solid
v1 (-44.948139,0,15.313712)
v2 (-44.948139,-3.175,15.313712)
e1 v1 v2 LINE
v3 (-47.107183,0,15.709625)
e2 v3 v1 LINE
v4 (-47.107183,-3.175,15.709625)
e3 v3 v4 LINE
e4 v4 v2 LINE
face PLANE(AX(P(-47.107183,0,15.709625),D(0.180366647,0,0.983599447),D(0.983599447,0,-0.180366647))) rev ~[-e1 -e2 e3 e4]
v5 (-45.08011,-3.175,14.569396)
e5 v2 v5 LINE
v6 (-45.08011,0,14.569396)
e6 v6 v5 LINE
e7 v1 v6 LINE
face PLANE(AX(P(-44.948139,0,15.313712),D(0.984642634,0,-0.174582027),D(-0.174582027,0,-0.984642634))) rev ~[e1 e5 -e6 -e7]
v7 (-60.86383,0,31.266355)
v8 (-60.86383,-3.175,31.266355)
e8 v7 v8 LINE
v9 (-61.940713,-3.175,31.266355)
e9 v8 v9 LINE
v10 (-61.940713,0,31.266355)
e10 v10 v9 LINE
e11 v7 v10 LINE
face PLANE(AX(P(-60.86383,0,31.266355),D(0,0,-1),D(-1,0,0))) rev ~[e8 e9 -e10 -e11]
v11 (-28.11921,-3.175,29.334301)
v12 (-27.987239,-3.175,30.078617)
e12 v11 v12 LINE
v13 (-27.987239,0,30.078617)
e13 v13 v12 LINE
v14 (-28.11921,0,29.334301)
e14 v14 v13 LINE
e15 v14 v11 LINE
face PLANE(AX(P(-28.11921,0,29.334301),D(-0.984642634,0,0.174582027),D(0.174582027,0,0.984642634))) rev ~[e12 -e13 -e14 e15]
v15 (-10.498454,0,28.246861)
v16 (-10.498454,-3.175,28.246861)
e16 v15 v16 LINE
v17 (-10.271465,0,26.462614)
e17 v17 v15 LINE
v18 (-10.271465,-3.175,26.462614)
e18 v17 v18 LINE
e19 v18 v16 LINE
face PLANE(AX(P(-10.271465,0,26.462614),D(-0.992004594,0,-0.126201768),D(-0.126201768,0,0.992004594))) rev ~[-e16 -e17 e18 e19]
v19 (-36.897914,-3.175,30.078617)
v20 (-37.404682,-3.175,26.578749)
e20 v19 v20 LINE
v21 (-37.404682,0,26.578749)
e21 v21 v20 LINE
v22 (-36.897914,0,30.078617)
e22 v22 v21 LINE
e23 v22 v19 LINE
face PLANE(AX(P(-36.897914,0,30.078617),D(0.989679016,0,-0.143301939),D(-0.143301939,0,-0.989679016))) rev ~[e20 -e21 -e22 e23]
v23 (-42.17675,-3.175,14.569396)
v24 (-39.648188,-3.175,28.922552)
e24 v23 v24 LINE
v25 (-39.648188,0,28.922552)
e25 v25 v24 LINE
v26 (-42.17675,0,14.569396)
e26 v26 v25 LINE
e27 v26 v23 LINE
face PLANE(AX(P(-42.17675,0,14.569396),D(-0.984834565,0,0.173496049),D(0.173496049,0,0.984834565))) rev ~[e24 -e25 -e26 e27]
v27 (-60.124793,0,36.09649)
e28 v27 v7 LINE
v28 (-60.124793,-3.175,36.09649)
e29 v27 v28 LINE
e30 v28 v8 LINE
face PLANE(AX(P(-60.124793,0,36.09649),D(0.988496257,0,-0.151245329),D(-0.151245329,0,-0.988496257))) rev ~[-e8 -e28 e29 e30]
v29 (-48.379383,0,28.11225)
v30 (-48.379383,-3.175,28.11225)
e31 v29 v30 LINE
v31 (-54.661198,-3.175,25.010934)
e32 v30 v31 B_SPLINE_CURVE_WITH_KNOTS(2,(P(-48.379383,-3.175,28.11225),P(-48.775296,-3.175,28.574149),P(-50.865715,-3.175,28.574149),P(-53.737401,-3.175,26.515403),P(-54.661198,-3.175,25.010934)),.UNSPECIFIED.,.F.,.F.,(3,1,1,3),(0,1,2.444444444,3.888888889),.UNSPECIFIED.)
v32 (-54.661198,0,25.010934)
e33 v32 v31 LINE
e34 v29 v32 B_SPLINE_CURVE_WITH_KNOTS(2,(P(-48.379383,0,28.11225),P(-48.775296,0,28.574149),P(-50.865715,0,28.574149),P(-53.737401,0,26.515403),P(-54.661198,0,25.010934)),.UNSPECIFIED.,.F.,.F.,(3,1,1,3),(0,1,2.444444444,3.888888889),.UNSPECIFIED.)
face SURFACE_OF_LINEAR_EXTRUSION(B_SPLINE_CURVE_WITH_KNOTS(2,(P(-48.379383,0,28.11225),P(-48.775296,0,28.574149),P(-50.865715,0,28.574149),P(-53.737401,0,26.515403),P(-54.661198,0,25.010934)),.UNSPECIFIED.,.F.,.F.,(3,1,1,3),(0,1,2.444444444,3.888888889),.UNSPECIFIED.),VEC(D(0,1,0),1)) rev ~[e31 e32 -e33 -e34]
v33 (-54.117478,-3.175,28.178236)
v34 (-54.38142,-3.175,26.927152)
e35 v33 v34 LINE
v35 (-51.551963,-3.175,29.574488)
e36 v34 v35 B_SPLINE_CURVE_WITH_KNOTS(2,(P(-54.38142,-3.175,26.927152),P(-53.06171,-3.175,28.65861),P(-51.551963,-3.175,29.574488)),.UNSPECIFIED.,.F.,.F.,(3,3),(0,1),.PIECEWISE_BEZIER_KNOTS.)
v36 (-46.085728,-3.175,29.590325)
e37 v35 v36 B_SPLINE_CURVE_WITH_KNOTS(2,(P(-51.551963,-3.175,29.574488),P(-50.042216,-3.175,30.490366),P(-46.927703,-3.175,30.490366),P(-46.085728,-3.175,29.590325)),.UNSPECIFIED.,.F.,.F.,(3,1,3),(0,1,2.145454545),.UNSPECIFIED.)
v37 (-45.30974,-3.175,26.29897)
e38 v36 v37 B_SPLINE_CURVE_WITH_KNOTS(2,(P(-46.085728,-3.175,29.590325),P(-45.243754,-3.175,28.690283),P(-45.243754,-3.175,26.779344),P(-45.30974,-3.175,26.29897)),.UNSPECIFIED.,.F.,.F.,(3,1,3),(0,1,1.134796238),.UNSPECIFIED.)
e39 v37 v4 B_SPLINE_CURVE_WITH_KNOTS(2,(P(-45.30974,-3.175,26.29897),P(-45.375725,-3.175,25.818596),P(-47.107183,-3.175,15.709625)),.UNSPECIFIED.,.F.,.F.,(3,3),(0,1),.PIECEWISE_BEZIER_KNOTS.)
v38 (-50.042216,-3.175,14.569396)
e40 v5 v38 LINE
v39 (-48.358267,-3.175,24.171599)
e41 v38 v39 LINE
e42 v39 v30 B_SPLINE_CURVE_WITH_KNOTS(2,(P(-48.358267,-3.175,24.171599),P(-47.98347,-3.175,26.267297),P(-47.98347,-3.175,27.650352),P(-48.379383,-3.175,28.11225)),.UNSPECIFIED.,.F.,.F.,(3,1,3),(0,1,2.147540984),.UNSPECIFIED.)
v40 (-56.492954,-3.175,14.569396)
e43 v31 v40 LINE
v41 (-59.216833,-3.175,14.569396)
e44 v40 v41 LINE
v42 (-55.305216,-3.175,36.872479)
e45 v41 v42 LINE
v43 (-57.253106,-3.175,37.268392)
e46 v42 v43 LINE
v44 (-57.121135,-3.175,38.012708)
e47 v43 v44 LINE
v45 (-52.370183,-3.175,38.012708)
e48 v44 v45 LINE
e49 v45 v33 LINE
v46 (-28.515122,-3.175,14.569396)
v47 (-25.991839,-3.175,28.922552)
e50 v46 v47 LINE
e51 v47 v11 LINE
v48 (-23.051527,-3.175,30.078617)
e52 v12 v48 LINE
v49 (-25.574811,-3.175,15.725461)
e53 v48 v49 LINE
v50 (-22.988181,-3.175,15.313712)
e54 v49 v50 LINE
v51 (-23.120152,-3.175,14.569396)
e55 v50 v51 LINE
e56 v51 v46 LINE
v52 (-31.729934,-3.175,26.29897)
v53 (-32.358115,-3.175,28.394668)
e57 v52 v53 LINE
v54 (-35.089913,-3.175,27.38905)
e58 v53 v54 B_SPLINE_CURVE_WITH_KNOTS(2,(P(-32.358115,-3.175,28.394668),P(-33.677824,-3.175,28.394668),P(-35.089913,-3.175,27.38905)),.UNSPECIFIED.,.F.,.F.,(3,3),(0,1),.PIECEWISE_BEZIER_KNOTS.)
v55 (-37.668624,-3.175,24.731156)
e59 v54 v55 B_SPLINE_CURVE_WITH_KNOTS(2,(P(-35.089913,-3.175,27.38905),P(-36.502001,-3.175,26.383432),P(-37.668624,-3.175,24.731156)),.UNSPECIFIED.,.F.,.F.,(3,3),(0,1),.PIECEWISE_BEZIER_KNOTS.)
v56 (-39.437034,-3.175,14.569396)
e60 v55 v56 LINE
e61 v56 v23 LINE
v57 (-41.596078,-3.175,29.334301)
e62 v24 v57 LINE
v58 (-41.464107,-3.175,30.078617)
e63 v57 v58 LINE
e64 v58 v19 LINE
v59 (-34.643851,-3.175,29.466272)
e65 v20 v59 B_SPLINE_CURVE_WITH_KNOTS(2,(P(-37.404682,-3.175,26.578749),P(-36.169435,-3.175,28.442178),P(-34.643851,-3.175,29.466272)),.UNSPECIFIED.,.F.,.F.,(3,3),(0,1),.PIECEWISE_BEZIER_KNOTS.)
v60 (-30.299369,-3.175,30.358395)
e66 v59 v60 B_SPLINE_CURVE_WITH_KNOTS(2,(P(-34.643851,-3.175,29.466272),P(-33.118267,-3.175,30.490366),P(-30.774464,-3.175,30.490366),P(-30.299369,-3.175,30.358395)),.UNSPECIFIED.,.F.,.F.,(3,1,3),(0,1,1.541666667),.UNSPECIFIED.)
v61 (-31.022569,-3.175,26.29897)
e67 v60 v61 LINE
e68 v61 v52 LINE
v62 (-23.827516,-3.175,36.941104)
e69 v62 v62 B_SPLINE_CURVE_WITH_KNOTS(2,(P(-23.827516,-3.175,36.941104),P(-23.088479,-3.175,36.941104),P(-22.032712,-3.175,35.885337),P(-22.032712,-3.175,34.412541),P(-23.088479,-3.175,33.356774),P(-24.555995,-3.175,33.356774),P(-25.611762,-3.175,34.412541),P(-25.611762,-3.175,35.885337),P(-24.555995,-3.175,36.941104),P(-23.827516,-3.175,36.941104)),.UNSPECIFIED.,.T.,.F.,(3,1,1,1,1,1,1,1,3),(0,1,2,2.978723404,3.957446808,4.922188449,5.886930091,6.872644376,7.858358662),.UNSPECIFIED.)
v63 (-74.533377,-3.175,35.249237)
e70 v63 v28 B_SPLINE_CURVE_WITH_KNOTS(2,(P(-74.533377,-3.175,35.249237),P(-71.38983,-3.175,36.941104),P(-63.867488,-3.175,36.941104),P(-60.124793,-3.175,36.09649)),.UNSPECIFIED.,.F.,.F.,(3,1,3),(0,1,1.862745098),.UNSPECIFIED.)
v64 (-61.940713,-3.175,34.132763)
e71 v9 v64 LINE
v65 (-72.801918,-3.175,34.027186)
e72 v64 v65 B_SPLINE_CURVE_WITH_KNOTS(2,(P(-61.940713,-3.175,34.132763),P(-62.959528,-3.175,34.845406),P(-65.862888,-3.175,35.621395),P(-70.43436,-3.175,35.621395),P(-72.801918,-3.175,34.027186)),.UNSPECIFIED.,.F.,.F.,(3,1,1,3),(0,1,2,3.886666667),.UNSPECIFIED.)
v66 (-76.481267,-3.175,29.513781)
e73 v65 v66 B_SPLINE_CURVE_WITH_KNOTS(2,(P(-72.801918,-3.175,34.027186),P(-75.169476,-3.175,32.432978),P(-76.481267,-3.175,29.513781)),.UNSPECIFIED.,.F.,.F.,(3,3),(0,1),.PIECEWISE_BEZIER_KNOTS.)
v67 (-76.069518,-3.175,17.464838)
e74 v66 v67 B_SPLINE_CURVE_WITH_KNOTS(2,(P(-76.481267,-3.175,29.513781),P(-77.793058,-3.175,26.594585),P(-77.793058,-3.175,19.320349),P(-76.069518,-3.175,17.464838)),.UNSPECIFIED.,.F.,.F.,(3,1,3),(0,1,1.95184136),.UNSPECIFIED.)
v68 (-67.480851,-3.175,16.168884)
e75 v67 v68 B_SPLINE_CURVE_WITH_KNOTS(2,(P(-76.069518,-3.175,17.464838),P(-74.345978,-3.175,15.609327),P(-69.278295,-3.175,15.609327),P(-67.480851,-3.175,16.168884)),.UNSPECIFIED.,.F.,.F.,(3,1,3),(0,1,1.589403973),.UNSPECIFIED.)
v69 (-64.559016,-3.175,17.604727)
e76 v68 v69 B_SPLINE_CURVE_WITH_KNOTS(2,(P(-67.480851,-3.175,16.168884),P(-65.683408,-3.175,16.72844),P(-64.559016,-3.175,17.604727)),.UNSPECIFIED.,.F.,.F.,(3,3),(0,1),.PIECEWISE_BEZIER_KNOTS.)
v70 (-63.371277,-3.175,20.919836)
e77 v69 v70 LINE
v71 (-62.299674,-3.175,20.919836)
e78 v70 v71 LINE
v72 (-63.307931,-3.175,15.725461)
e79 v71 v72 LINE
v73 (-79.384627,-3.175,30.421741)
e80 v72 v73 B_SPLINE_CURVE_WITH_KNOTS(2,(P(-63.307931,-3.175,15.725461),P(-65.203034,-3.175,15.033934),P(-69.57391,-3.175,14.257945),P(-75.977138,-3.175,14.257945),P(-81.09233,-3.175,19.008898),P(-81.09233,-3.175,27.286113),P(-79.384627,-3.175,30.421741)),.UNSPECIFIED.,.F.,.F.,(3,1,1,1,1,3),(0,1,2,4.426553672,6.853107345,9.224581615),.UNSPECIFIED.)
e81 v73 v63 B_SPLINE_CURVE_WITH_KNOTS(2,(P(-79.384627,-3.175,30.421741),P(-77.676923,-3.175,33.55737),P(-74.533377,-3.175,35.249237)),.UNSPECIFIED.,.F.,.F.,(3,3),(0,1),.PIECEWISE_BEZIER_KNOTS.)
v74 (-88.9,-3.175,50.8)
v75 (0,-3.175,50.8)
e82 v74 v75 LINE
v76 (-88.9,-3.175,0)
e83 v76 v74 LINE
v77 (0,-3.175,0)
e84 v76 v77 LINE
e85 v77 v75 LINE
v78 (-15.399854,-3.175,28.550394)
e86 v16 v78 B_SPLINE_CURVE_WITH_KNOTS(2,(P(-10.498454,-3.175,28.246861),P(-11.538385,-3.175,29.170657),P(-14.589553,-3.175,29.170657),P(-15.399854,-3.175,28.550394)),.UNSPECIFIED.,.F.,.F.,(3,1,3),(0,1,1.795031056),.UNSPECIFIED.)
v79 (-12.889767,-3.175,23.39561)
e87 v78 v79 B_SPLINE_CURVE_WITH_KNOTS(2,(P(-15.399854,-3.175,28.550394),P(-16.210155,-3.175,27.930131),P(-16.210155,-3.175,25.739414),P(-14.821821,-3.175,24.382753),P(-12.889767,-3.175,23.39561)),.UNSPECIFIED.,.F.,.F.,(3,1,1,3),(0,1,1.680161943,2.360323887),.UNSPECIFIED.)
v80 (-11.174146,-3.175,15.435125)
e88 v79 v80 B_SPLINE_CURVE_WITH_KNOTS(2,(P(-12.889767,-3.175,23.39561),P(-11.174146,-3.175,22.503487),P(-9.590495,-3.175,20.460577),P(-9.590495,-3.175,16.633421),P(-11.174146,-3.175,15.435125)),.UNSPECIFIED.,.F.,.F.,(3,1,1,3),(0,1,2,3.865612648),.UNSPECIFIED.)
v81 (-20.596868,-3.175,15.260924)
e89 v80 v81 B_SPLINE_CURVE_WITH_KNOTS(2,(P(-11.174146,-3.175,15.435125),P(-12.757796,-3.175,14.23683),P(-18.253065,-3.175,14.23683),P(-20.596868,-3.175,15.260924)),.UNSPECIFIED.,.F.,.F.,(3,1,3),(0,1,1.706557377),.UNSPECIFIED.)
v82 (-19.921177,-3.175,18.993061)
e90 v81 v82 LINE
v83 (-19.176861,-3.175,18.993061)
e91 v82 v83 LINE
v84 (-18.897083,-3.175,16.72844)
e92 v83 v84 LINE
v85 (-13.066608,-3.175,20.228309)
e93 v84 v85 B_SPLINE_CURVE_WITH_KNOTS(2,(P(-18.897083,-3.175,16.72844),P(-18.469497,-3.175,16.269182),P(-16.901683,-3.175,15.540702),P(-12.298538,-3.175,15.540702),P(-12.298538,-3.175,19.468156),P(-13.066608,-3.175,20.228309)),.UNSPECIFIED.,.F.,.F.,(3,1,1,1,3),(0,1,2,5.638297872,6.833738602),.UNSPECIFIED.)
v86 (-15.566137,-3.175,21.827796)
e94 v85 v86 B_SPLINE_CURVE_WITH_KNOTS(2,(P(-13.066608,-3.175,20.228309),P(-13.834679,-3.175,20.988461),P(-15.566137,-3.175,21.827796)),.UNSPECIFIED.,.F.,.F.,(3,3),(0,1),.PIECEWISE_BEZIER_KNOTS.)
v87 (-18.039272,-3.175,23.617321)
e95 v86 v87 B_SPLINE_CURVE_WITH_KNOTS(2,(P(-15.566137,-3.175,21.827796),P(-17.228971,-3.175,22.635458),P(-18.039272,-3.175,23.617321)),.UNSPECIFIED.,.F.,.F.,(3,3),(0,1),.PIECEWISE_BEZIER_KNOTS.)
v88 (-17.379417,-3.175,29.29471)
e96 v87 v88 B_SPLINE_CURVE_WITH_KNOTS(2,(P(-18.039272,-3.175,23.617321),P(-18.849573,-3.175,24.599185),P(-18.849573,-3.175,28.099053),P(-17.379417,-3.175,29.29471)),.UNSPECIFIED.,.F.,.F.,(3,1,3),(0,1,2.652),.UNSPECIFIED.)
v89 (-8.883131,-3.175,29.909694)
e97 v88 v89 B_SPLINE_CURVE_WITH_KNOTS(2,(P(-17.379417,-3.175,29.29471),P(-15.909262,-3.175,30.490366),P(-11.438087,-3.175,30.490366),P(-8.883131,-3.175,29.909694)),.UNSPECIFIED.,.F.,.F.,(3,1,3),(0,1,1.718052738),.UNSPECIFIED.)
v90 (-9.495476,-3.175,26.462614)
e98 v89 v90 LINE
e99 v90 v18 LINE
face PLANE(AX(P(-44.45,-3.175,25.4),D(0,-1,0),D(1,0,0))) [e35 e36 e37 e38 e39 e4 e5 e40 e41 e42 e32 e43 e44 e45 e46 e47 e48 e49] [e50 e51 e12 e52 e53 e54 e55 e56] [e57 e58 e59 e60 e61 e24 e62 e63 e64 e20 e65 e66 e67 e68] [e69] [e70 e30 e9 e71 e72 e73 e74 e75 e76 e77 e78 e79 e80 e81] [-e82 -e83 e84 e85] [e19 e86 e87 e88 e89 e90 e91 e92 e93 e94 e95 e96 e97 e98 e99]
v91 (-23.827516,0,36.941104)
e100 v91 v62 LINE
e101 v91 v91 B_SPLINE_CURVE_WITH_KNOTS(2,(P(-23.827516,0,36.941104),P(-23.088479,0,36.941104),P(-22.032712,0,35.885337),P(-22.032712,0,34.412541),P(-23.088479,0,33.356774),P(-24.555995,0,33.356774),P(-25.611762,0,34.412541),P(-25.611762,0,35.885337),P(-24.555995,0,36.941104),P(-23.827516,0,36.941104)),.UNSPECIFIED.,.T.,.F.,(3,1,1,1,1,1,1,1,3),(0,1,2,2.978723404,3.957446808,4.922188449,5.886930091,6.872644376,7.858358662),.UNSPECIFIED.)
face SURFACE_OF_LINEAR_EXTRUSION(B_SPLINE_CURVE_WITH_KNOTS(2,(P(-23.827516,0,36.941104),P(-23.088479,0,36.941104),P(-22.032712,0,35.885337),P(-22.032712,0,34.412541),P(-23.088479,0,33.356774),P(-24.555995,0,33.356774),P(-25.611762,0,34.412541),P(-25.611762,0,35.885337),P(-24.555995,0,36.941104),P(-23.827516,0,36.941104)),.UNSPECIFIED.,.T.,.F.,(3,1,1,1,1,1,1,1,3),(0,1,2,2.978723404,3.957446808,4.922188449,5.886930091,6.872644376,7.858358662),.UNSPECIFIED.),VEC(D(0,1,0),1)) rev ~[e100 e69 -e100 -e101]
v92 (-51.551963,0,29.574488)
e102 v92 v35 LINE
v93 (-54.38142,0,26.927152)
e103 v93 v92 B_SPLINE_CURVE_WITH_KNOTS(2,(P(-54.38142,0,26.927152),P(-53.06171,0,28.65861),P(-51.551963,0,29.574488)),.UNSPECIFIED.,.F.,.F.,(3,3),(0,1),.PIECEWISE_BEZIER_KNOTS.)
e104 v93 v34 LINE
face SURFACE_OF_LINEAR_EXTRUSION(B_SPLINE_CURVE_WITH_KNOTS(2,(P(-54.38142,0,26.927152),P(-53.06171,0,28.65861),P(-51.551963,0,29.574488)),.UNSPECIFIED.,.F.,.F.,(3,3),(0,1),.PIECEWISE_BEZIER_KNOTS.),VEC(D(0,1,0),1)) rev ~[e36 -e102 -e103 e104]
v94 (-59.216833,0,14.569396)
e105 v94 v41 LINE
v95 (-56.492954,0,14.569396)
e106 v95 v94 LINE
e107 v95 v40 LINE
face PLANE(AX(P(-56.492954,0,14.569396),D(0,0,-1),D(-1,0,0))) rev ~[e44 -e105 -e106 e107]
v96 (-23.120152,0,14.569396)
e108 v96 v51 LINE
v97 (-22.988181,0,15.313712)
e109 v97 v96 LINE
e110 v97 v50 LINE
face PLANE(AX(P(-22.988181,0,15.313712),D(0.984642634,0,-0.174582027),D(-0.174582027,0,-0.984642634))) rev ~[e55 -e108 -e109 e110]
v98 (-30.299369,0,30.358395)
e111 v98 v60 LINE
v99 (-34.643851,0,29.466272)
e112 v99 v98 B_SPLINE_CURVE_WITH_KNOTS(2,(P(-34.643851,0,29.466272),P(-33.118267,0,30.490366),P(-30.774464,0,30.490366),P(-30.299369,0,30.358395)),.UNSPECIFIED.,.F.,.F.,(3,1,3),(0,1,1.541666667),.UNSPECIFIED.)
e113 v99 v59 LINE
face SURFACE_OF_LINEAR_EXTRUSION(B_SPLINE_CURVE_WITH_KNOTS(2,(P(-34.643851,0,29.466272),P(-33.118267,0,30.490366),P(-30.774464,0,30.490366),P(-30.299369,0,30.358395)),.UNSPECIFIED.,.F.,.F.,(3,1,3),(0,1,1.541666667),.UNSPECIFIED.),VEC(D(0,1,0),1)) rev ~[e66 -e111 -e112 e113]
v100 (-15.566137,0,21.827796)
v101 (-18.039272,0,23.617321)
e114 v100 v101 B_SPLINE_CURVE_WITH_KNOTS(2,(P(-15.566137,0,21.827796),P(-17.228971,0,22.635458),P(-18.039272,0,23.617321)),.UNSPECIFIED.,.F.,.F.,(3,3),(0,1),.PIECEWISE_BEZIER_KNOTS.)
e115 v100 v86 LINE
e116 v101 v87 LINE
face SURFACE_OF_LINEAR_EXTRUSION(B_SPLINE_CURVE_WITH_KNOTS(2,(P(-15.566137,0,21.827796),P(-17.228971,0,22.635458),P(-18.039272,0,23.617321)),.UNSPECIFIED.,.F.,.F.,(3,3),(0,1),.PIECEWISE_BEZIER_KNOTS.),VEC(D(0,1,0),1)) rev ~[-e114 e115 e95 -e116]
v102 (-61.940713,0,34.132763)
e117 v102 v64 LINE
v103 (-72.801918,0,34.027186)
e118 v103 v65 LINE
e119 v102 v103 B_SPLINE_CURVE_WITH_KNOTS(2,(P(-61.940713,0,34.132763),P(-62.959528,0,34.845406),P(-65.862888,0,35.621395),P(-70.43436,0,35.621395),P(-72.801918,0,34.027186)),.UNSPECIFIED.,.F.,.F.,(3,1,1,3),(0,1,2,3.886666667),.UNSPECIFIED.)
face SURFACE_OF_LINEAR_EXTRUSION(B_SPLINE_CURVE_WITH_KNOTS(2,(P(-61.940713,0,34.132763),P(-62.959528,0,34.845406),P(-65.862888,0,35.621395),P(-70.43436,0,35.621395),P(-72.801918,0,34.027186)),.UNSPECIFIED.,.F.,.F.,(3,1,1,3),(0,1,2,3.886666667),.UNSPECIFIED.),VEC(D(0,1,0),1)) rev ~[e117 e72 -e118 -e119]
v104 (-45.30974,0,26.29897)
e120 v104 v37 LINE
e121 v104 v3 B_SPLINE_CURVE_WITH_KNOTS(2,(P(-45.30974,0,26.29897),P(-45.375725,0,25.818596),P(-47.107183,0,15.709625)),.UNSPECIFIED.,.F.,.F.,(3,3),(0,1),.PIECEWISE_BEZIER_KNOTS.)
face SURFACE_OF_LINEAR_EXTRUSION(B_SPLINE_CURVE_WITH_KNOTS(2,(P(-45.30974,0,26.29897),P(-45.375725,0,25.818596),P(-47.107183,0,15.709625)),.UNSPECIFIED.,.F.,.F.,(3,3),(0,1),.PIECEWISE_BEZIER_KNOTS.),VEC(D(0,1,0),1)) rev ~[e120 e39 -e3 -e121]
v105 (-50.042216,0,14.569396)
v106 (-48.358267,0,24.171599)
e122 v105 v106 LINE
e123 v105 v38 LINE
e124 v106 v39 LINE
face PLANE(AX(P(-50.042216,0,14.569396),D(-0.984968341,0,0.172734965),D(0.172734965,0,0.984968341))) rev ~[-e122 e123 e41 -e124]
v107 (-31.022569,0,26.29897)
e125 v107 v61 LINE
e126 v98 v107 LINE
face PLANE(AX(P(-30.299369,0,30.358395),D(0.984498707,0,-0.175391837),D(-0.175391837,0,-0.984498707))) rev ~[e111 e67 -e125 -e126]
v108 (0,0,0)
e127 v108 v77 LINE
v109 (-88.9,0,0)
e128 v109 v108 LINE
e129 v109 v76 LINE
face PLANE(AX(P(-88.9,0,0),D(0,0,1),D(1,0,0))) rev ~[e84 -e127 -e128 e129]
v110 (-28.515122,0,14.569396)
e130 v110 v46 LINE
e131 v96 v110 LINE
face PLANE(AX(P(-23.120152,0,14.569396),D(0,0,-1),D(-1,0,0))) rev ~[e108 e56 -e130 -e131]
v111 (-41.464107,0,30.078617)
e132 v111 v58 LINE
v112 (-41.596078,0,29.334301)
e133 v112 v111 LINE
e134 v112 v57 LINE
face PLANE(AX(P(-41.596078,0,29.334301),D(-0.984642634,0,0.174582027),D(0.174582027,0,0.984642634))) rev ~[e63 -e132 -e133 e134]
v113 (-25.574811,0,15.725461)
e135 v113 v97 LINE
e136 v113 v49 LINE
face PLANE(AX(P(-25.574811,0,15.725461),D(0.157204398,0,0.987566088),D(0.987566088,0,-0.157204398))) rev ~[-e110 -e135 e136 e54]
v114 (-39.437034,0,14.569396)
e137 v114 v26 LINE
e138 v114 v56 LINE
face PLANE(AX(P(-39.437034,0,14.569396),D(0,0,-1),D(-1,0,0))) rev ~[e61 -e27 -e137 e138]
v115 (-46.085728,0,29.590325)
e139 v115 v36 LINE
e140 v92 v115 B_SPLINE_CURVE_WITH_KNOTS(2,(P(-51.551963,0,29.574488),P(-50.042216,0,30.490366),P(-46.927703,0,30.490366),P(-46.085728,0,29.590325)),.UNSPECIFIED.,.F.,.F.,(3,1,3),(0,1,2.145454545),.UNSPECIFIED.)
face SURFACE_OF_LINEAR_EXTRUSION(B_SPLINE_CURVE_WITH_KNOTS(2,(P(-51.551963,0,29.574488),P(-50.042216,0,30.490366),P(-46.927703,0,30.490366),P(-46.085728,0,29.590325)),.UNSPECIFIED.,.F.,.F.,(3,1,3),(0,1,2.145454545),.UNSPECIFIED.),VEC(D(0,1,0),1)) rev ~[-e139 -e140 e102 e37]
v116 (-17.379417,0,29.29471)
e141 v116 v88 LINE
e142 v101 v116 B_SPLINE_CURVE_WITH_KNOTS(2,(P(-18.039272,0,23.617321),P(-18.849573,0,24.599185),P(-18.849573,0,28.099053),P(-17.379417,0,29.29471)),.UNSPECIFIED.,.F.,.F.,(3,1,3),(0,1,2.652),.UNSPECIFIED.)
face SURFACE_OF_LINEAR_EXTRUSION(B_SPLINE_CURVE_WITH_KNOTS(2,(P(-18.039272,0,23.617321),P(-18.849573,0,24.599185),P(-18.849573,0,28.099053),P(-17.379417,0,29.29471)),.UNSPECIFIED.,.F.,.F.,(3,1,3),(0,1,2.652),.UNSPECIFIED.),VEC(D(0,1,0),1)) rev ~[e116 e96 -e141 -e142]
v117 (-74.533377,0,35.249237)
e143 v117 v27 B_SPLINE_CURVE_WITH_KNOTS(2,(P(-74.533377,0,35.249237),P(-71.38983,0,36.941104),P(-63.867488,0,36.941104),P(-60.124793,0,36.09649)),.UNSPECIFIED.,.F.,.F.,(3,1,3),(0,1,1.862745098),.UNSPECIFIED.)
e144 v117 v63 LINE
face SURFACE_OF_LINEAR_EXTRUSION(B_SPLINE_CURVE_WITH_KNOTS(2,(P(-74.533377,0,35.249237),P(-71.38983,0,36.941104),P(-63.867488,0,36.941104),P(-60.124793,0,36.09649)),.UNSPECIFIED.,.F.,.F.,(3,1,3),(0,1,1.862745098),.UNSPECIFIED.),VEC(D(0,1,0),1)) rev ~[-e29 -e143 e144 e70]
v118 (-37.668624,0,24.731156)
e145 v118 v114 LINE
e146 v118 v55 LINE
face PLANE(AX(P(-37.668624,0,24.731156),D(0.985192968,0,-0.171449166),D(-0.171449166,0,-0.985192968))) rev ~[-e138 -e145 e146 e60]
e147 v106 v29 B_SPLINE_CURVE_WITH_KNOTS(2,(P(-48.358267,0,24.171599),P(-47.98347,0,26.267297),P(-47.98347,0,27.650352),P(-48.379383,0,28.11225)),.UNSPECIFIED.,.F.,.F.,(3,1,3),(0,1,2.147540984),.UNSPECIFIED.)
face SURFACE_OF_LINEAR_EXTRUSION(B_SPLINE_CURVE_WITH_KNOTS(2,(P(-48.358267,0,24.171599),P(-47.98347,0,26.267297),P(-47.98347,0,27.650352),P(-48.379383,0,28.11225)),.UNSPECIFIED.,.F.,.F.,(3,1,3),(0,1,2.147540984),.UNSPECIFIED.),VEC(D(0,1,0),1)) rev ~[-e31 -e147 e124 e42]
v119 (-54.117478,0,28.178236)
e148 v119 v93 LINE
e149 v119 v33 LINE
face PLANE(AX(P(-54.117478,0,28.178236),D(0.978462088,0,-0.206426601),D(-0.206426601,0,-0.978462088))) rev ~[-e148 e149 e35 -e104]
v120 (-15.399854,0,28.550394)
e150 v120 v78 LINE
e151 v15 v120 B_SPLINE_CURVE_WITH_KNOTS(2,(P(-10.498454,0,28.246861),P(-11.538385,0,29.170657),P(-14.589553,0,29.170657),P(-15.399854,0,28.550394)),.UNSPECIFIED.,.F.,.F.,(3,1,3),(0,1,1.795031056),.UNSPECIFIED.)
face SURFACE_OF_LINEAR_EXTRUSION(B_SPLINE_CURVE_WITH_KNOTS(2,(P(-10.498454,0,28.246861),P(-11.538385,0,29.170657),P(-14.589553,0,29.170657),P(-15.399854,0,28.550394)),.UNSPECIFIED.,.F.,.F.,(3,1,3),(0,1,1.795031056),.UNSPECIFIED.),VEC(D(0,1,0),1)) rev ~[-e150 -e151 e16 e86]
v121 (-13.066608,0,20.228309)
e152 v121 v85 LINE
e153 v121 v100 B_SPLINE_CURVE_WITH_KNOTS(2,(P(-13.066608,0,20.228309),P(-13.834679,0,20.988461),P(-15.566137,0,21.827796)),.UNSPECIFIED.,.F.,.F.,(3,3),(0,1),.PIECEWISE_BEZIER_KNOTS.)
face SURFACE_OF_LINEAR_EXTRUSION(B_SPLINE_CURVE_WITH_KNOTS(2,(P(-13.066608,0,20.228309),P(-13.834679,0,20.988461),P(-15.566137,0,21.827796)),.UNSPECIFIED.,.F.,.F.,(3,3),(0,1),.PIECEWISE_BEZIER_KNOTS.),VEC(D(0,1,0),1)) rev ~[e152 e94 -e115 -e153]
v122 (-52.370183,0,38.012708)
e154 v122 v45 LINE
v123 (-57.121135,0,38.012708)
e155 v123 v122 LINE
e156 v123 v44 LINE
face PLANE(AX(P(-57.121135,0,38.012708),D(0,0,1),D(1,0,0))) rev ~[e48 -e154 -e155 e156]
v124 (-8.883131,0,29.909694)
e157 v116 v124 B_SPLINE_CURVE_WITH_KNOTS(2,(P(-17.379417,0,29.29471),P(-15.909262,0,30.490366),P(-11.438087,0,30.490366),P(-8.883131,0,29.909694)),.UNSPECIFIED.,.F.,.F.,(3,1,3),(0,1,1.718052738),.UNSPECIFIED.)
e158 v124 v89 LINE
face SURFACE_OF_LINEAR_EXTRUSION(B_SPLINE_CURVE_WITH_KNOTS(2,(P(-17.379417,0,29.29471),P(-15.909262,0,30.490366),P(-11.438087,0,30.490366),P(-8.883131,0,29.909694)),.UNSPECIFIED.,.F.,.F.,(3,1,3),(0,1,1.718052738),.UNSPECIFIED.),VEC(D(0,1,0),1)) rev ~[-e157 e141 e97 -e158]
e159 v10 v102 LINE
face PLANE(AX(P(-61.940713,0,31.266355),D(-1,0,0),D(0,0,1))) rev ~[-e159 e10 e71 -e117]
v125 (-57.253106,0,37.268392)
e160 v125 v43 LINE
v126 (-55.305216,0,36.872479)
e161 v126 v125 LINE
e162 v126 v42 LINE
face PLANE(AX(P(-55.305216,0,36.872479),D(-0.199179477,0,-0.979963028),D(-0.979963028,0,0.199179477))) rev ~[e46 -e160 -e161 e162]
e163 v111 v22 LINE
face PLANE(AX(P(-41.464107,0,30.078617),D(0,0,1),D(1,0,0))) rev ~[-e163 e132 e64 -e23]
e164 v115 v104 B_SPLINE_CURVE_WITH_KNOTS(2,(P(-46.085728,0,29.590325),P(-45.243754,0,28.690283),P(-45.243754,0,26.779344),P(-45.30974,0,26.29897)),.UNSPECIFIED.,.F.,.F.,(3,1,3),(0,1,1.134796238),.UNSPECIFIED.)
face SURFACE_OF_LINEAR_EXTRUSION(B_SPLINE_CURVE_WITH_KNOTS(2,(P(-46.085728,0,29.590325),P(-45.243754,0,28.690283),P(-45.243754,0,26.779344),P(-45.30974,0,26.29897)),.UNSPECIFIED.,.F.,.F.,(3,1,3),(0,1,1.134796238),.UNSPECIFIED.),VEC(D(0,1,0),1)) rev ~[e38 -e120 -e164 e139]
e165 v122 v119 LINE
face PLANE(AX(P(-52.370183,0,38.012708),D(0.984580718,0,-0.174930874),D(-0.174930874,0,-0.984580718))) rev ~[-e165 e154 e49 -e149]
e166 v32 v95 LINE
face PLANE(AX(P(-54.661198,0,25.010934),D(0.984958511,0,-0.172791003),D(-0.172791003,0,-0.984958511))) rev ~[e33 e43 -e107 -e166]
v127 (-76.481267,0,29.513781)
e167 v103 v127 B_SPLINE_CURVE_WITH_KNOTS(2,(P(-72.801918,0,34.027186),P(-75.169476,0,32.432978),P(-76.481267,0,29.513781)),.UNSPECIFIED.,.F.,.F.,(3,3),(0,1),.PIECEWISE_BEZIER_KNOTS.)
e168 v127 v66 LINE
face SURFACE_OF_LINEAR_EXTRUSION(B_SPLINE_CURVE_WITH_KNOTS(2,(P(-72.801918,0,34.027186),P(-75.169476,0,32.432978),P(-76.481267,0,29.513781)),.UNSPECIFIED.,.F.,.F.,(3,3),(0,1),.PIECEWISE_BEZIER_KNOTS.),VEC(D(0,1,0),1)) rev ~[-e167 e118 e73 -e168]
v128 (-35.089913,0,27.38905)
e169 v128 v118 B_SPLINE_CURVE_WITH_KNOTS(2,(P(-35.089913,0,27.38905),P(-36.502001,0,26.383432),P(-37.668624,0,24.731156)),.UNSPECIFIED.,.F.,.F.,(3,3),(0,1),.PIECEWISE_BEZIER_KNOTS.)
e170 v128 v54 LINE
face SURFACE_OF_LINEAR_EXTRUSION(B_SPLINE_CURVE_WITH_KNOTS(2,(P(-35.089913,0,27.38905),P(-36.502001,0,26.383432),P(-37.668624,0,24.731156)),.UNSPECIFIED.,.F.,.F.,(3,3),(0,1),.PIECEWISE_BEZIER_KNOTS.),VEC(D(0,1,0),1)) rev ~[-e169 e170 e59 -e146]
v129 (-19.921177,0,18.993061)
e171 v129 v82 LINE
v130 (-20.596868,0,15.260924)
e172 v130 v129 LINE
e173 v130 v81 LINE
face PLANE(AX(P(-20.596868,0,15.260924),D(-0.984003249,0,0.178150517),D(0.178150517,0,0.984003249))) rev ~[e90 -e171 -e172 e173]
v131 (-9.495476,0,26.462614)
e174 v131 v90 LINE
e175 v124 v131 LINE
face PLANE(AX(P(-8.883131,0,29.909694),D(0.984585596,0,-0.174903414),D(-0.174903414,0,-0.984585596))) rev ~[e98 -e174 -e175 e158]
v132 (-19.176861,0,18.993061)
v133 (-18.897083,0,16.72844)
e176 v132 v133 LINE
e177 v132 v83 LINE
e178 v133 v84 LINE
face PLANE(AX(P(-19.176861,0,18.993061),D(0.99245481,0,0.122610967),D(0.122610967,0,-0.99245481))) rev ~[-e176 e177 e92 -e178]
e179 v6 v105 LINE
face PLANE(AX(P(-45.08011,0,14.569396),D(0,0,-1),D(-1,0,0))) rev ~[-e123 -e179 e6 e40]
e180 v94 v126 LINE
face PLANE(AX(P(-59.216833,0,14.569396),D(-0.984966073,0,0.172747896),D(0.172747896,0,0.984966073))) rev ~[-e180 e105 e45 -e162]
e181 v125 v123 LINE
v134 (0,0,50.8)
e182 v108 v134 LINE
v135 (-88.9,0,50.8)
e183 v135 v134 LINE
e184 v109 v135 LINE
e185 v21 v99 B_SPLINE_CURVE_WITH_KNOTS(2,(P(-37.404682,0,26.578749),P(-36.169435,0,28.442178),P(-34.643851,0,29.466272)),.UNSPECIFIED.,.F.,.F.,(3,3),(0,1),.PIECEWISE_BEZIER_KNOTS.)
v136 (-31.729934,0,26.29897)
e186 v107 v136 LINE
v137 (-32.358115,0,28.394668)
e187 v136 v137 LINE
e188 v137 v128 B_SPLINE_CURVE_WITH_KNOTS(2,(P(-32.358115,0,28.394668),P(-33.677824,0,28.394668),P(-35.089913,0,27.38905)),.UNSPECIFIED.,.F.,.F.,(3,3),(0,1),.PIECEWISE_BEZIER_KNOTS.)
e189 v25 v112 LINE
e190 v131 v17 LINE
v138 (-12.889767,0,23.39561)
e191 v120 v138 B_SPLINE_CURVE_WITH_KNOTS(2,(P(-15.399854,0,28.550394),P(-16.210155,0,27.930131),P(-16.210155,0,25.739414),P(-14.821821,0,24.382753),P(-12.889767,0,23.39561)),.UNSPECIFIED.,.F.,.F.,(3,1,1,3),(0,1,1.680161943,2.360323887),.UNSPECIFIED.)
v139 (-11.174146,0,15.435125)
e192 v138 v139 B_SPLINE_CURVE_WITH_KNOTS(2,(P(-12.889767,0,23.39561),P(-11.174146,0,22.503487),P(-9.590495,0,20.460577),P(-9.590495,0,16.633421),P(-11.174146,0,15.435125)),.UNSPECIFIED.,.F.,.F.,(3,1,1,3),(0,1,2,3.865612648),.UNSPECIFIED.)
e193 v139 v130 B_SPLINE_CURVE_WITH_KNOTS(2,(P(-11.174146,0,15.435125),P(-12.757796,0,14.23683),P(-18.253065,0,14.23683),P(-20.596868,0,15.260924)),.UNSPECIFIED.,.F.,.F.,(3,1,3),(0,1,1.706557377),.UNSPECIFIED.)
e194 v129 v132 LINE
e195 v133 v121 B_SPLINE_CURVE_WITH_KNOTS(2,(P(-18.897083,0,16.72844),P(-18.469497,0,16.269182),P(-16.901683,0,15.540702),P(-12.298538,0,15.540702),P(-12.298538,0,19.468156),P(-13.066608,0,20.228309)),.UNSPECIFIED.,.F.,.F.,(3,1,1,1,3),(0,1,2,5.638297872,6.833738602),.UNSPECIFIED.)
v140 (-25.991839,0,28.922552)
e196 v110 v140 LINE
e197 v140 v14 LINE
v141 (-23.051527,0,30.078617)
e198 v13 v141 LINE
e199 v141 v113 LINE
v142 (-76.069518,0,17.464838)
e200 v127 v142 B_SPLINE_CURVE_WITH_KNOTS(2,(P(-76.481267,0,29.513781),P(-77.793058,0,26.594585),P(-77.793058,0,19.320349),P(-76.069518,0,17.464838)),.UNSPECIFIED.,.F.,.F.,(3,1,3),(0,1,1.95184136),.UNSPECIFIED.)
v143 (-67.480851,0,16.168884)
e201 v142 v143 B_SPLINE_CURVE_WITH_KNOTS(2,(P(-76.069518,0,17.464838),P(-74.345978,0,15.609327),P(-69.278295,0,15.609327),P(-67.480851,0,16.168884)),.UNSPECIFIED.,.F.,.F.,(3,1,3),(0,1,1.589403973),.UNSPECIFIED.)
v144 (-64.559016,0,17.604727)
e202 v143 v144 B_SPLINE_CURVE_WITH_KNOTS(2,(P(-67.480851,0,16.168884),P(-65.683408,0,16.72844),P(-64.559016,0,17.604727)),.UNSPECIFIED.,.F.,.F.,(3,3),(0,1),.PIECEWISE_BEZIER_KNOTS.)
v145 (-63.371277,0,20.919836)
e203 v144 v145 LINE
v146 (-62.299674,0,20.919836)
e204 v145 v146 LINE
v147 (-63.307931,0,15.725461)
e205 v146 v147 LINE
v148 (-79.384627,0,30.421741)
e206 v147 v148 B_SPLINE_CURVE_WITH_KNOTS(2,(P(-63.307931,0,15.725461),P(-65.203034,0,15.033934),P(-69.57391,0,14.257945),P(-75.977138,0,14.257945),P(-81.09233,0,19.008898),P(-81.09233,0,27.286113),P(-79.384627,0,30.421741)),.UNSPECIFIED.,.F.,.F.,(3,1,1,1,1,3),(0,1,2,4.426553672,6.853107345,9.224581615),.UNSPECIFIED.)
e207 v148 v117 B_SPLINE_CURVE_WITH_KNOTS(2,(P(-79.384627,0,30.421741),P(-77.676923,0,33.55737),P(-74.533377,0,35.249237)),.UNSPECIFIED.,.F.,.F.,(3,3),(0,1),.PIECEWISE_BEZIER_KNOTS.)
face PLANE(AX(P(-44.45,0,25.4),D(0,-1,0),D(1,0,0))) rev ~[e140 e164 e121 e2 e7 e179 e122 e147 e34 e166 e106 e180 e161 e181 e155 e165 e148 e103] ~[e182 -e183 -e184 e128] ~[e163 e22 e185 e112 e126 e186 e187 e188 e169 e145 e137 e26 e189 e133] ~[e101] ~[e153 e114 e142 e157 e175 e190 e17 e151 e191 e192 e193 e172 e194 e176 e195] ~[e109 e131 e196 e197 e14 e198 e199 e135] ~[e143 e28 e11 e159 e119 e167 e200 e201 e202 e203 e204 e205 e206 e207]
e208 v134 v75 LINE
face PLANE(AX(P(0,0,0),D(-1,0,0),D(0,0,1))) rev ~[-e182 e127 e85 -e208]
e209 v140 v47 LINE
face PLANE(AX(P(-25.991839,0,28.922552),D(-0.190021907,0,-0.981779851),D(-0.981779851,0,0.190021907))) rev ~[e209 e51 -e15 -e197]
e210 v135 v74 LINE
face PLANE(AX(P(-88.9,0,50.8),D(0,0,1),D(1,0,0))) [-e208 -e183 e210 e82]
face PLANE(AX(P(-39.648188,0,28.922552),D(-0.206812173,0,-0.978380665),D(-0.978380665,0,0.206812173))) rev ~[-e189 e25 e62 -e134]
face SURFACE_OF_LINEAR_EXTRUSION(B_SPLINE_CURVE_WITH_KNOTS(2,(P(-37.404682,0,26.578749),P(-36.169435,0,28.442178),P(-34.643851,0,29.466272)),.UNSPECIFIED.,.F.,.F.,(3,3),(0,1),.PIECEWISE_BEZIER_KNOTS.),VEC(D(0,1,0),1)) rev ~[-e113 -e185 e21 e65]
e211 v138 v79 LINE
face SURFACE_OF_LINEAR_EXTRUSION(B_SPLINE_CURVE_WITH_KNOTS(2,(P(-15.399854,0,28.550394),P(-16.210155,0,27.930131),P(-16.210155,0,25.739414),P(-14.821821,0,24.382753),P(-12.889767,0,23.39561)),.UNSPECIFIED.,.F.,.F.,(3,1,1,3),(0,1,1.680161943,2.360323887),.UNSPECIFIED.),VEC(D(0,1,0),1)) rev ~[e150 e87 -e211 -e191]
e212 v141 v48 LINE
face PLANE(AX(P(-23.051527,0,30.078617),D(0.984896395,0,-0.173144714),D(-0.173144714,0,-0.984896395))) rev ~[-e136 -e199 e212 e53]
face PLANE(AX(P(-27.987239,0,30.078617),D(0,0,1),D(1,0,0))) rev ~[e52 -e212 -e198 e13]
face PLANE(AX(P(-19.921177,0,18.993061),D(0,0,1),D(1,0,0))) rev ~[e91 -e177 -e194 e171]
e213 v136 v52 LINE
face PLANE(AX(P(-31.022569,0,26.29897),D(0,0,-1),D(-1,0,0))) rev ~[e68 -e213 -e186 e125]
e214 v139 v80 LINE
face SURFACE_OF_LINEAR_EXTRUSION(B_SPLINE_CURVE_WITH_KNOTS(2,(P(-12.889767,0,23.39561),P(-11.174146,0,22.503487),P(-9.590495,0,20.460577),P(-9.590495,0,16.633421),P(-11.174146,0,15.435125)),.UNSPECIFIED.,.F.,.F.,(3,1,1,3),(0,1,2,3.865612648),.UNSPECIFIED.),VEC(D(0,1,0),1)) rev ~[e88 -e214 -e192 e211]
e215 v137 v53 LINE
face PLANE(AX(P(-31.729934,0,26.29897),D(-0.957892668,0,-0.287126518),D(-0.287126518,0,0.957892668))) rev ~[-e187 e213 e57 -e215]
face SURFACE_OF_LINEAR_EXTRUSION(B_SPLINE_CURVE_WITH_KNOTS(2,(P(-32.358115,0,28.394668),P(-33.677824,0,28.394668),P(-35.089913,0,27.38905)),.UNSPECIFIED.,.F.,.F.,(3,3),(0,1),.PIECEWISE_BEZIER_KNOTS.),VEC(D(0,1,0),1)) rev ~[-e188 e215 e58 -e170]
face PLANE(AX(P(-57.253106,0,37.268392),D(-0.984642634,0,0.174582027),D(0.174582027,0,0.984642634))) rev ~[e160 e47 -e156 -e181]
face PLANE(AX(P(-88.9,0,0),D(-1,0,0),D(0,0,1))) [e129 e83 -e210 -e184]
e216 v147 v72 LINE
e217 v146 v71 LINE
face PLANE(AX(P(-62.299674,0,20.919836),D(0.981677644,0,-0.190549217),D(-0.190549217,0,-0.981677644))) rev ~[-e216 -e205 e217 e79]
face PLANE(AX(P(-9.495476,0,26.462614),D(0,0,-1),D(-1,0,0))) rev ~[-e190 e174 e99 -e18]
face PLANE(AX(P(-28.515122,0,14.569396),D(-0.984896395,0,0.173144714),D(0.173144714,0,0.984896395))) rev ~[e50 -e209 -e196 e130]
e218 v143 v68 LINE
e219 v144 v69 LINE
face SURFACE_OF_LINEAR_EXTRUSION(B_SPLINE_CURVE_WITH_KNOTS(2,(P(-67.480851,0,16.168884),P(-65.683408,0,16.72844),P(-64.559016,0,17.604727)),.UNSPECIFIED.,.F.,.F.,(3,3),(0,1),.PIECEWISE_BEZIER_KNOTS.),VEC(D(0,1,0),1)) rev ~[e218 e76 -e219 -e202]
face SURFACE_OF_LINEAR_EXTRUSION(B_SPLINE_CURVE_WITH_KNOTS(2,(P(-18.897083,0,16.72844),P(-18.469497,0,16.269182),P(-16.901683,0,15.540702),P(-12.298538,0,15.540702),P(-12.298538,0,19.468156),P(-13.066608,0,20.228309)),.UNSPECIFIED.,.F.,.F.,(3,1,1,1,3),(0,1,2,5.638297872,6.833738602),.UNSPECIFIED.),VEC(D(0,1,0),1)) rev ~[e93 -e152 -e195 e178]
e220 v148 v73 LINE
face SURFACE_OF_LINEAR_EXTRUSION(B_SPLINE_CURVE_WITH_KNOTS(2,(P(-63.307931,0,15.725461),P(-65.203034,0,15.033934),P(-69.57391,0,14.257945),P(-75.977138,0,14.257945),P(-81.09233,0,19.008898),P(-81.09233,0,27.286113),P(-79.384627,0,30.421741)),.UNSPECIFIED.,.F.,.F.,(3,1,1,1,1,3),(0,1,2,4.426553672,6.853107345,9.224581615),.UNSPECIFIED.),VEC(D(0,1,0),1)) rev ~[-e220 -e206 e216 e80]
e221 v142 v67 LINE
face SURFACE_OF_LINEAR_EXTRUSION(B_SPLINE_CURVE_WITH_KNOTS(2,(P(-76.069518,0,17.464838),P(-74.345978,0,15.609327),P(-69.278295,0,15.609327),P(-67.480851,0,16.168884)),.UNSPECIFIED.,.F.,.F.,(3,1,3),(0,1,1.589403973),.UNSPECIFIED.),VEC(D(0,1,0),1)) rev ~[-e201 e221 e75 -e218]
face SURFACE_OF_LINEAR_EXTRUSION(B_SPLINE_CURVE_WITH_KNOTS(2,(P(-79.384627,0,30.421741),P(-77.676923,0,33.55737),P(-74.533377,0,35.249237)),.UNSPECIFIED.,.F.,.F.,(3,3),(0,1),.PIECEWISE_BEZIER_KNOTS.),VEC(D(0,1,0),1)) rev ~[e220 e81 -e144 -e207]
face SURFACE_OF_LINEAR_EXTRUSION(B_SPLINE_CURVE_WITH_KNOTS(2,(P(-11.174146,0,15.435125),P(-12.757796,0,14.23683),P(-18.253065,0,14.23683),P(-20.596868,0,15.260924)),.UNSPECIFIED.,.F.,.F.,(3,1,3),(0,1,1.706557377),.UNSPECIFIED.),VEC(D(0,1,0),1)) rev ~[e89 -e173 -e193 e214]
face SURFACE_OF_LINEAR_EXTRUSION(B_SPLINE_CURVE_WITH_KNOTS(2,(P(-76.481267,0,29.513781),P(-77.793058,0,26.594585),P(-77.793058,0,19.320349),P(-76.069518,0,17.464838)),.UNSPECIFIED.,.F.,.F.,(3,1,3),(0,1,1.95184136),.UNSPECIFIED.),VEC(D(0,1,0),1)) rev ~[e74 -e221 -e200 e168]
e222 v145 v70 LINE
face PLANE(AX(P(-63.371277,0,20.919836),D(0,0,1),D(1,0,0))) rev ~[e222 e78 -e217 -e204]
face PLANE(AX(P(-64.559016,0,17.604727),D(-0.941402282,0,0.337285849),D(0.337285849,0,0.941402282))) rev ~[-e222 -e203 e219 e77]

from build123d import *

# Parameters (mm, degrees)
F0_W     = 88.9
F0_H     = 50.8
F1_DEPTH = 3.175


with BuildPart() as f1:
    # F0 (on Front) → F1 (new body)
    with BuildSketch(Plane.XZ):
        with Locations((-44.45, 25.4)):
            Rectangle(F0_W, F0_H)
        with BuildLine():
            add(Edge.make_bspline(
                [(-34.643851095, 29.4662719552), (-33.1182674441, 30.4903661706), (-31.5979626294, 30.4903661706)],
                knots=[0, 0, 0, 1, 1, 1], degree=2))
            add(Edge.make_bspline(
                [(-31.5979626294, 30.4903661706), (-30.7744641881, 30.4903661706), (-30.2993689335, 30.3583952666)],
                knots=[0, 0, 0, 1, 1, 1], degree=2))
            Line((-30.2993689335, 30.3583952666), (-31.0225694878, 26.2989702579))
            Line((-31.0225694878, 26.2989702579), (-31.7299335335, 26.2989702579))
            Line((-31.7299335335, 26.2989702579), (-32.3581150368, 28.3946682143))
            add(Edge.make_bspline(
                [(-32.3581150368, 28.3946682143), (-33.6778240773, 28.3946682143), (-35.0899127507, 27.3890499254)],
                knots=[0, 0, 0, 1, 1, 1], degree=2))
            add(Edge.make_bspline(
                [(-35.0899127507, 27.3890499254), (-36.502001424, 26.3834316365), (-37.6686242158, 24.7311559178)],
                knots=[0, 0, 0, 1, 1, 1], degree=2))
            Line((-37.6686242158, 24.7311559178), (-39.4370343302, 14.5693963057))
            Line((-39.4370343302, 14.5693963057), (-42.1767502983, 14.5693963057))
            Line((-42.1767502983, 14.5693963057), (-39.6481877766, 28.9225518305))
            Line((-39.6481877766, 28.9225518305), (-41.5960783205, 29.3343010511))
            Line((-41.5960783205, 29.3343010511), (-41.4641074164, 30.07861695))
            Line((-41.4641074164, 30.07861695), (-36.8979141362, 30.07861695))
            Line((-36.8979141362, 30.07861695), (-37.4046824077, 26.5787485745))
            add(Edge.make_bspline(
                [(-37.4046824077, 26.5787485745), (-36.1694347458, 28.4421777397), (-34.643851095, 29.4662719552)],
                knots=[0, 0, 0, 1, 1, 1], degree=2))
        make_face(mode=Mode.SUBTRACT)
        Polygon((-23.051526883, 30.07861695), (-25.5748105685, 15.7254614252), (-22.988180849, 15.3137122046), (-23.1201517531, 14.5693963057), (-28.5151223108, 14.5693963057), (-25.9918386253, 28.9225518305), (-28.1192095986, 29.3343010511), (-27.9872386945, 30.07861695), align=None, mode=Mode.SUBTRACT)
        with BuildLine():
            add(Edge.make_bspline(
                [(-10.3823200939, 21.48203226), (-9.5904946696, 20.4605774626), (-9.5904946696, 19.1250319136)],
                knots=[0, 0, 0, 1, 1, 1], degree=2))
            add(Edge.make_bspline(
                [(-9.5904946696, 19.1250319136), (-9.5904946696, 16.6334212451), (-11.1741455182, 15.4351254363)],
                knots=[0, 0, 0, 1, 1, 1], degree=2))
            add(Edge.make_bspline(
                [(-11.1741455182, 15.4351254363), (-12.7577963669, 14.2368296275), (-15.9778864258, 14.2368296275)],
                knots=[0, 0, 0, 1, 1, 1], degree=2))
            add(Edge.make_bspline(
                [(-15.9778864258, 14.2368296275), (-18.2530648116, 14.2368296275), (-20.5968680676, 15.260923843)],
                knots=[0, 0, 0, 1, 1, 1], degree=2))
            Line((-20.5968680676, 15.260923843), (-19.9211770388, 18.9930610096))
            Line((-19.9211770388, 18.9930610096), (-19.17686114, 18.9930610096))
            Line((-19.17686114, 18.9930610096), (-18.8970828234, 16.728440296))
            add(Edge.make_bspline(
                [(-18.8970828234, 16.728440296), (-18.4694970943, 16.2691815499), (-17.6855899242, 15.9049418547)],
                knots=[0, 0, 0, 1, 1, 1], degree=2))
            add(Edge.make_bspline(
                [(-17.6855899242, 15.9049418547), (-16.9016827541, 15.5407021595), (-15.9092615556, 15.5407021595)],
                knots=[0, 0, 0, 1, 1, 1], degree=2))
            add(Edge.make_bspline(
                [(-15.9092615556, 15.5407021595), (-12.2985376208, 15.5407021595), (-12.2985376208, 18.4968504103)],
                knots=[0, 0, 0, 1, 1, 1], degree=2))
            add(Edge.make_bspline(
                [(-12.2985376208, 18.4968504103), (-12.2985376208, 19.4681562642), (-13.0666082824, 20.2283086715)],
                knots=[0, 0, 0, 1, 1, 1], degree=2))
            add(Edge.make_bspline(
                [(-13.0666082824, 20.2283086715), (-13.8346789439, 20.9884610788), (-15.5661372051, 21.8277960286)],
                knots=[0, 0, 0, 1, 1, 1], degree=2))
            add(Edge.make_bspline(
                [(-15.5661372051, 21.8277960286), (-17.2289705962, 22.6354579614), (-18.0392719471, 23.6173214876)],
                knots=[0, 0, 0, 1, 1, 1], degree=2))
            add(Edge.make_bspline(
                [(-18.0392719471, 23.6173214876), (-18.8495732979, 24.5991850137), (-18.8495732979, 25.9188940542)],
                knots=[0, 0, 0, 1, 1, 1], degree=2))
            add(Edge.make_bspline(
                [(-18.8495732979, 25.9188940542), (-18.8495732979, 28.0990533892), (-17.3794174268, 29.2947097799)],
                knots=[0, 0, 0, 1, 1, 1], degree=2))
            add(Edge.make_bspline(
                [(-17.3794174268, 29.2947097799), (-15.9092615556, 30.4903661706), (-13.3067953277, 30.4903661706)],
                knots=[0, 0, 0, 1, 1, 1], degree=2))
            add(Edge.make_bspline(
                [(-13.3067953277, 30.4903661706), (-11.4380873263, 30.4903661706), (-8.8831306239, 29.9096941928)],
                knots=[0, 0, 0, 1, 1, 1], degree=2))
            Line((-8.8831306239, 29.9096941928), (-9.4954756187, 26.4626141789))
            Line((-9.4954756187, 26.4626141789), (-10.2714645345, 26.4626141789))
            Line((-10.2714645345, 26.4626141789), (-10.4984544895, 28.2468608017))
            add(Edge.make_bspline(
                [(-10.4984544895, 28.2468608017), (-11.5383852134, 29.1706571301), (-13.2381704576, 29.1706571301)],
                knots=[0, 0, 0, 1, 1, 1], degree=2))
            add(Edge.make_bspline(
                [(-13.2381704576, 29.1706571301), (-14.5895525151, 29.1706571301), (-15.399853866, 28.5503938811)],
                knots=[0, 0, 0, 1, 1, 1], degree=2))
            add(Edge.make_bspline(
                [(-15.399853866, 28.5503938811), (-16.2101552169, 27.930130632), (-16.2101552169, 26.6262581)],
                knots=[0, 0, 0, 1, 1, 1], degree=2))
            add(Edge.make_bspline(
                [(-16.2101552169, 26.6262581), (-16.2101552169, 25.7394136247), (-15.5159882616, 25.0610831779)],
                knots=[0, 0, 0, 1, 1, 1], degree=2))
            add(Edge.make_bspline(
                [(-15.5159882616, 25.0610831779), (-14.8218213063, 24.3827527311), (-12.8897672709, 23.3956103688)],
                knots=[0, 0, 0, 1, 1, 1], degree=2))
            add(Edge.make_bspline(
                [(-12.8897672709, 23.3956103688), (-11.1741455182, 22.5034870574), (-10.3823200939, 21.48203226)],
                knots=[0, 0, 0, 1, 1, 1], degree=2))
        make_face(mode=Mode.SUBTRACT)
        with BuildLine():
            add(Edge.make_bspline(
                [(-67.3884718085, 14.6459394301), (-69.5739099796, 14.2579449722), (-71.442617981, 14.2579449722)],
                knots=[0, 0, 0, 1, 1, 1], degree=2))
            add(Edge.make_bspline(
                [(-71.442617981, 14.2579449722), (-75.9771382443, 14.2579449722), (-78.5347343648, 16.6334212451)],
                knots=[0, 0, 0, 1, 1, 1], degree=2))
            add(Edge.make_bspline(
                [(-78.5347343648, 16.6334212451), (-81.0923304853, 19.008897518), (-81.0923304853, 23.1950145946)],
                knots=[0, 0, 0, 1, 1, 1], degree=2))
            add(Edge.make_bspline(
                [(-81.0923304853, 23.1950145946), (-81.0923304853, 27.2861126202), (-79.3846269869, 30.4217413005)],
                knots=[0, 0, 0, 1, 1, 1], degree=2))
            add(Edge.make_bspline(
                [(-79.3846269869, 30.4217413005), (-77.6769234884, 33.5573699808), (-74.5333765539, 35.2492369708)],
                knots=[0, 0, 0, 1, 1, 1], degree=2))
            add(Edge.make_bspline(
                [(-74.5333765539, 35.2492369708), (-71.3898296194, 36.9411039607), (-67.3515199554, 36.9411039607)],
                knots=[0, 0, 0, 1, 1, 1], degree=2))
            add(Edge.make_bspline(
                [(-67.3515199554, 36.9411039607), (-63.8674880884, 36.9411039607), (-60.1247932494, 36.0964901748)],
                knots=[0, 0, 0, 1, 1, 1], degree=2))
            Line((-60.1247932494, 36.0964901748), (-60.8638303121, 31.2663550865))
            Line((-60.8638303121, 31.2663550865), (-61.9407128892, 31.2663550865))
            Line((-61.9407128892, 31.2663550865), (-61.9407128892, 34.1327631225))
            add(Edge.make_bspline(
                [(-61.9407128892, 34.1327631225), (-62.9595282685, 34.8454060044), (-64.4112082131, 35.2334004623)],
                knots=[0, 0, 0, 1, 1, 1], degree=2))
            add(Edge.make_bspline(
                [(-64.4112082131, 35.2334004623), (-65.8628881577, 35.6213949202), (-67.4465390063, 35.6213949202)],
                knots=[0, 0, 0, 1, 1, 1], degree=2))
            add(Edge.make_bspline(
                [(-67.4465390063, 35.6213949202), (-70.434360274, 35.6213949202), (-72.8019182927, 34.0271863992)],
                knots=[0, 0, 0, 1, 1, 1], degree=2))
            add(Edge.make_bspline(
                [(-72.8019182927, 34.0271863992), (-75.1694763114, 32.4329778783), (-76.4812670977, 29.5137814806)],
                knots=[0, 0, 0, 1, 1, 1], degree=2))
            add(Edge.make_bspline(
                [(-76.4812670977, 29.5137814806), (-77.793057884, 26.594585083), (-77.793057884, 22.8677267525)],
                knots=[0, 0, 0, 1, 1, 1], degree=2))
            add(Edge.make_bspline(
                [(-77.793057884, 22.8677267525), (-77.793057884, 19.3203488516), (-76.0695178771, 17.4648379406)],
                knots=[0, 0, 0, 1, 1, 1], degree=2))
            add(Edge.make_bspline(
                [(-76.0695178771, 17.4648379406), (-74.3459778702, 15.6093270297), (-71.1575608282, 15.6093270297)],
                knots=[0, 0, 0, 1, 1, 1], degree=2))
            add(Edge.make_bspline(
                [(-71.1575608282, 15.6093270297), (-69.2782951545, 15.6093270297), (-67.4808514413, 16.1688836628)],
                knots=[0, 0, 0, 1, 1, 1], degree=2))
            add(Edge.make_bspline(
                [(-67.4808514413, 16.1688836628), (-65.6834077281, 16.728440296), (-64.5590156256, 17.6047270989)],
                knots=[0, 0, 0, 1, 1, 1], degree=2))
            Line((-64.5590156256, 17.6047270989), (-63.3712774891, 20.9198362087))
            Line((-63.3712774891, 20.9198362087), (-62.2996737482, 20.9198362087))
            Line((-62.2996737482, 20.9198362087), (-63.3079314552, 15.7254614252))
            add(Edge.make_bspline(
                [(-63.3079314552, 15.7254614252), (-65.2030336374, 15.033933888), (-67.3884718085, 14.6459394301)],
                knots=[0, 0, 0, 1, 1, 1], degree=2))
        make_face(mode=Mode.SUBTRACT)
        with BuildLine():
            Line((-59.2168334296, 14.5693963057), (-55.3052158334, 36.8724790906))
            Line((-55.3052158334, 36.8724790906), (-57.2531063773, 37.2683918028))
            Line((-57.2531063773, 37.2683918028), (-57.1211354732, 38.0127077016))
            Line((-57.1211354732, 38.0127077016), (-52.3701829273, 38.0127077016))
            Line((-52.3701829273, 38.0127077016), (-54.117477697, 28.1782359316))
            Line((-54.117477697, 28.1782359316), (-54.3814195051, 26.9271517612))
            add(Edge.make_bspline(
                [(-54.3814195051, 26.9271517612), (-53.0617104645, 28.6586100224), (-51.5519633222, 29.5744880965)],
                knots=[0, 0, 0, 1, 1, 1], degree=2))
            add(Edge.make_bspline(
                [(-51.5519633222, 29.5744880965), (-50.0422161798, 30.4903661706), (-48.5905362352, 30.4903661706)],
                knots=[0, 0, 0, 1, 1, 1], degree=2))
            add(Edge.make_bspline(
                [(-48.5905362352, 30.4903661706), (-46.9277028442, 30.4903661706), (-46.0857284763, 29.590324605)],
                knots=[0, 0, 0, 1, 1, 1], degree=2))
            add(Edge.make_bspline(
                [(-46.0857284763, 29.590324605), (-45.2437541085, 28.6902830394), (-45.2437541085, 27.0063343036)],
                knots=[0, 0, 0, 1, 1, 1], degree=2))
            add(Edge.make_bspline(
                [(-45.2437541085, 27.0063343036), (-45.2437541085, 26.7793443487), (-45.3097395605, 26.2989702579)],
                knots=[0, 0, 0, 1, 1, 1], degree=2))
            add(Edge.make_bspline(
                [(-45.3097395605, 26.2989702579), (-45.3757250125, 25.8185961672), (-47.1071832737, 15.7096249167)],
                knots=[0, 0, 0, 1, 1, 1], degree=2))
            Line((-47.1071832737, 15.7096249167), (-44.9481392834, 15.3137122046))
            Line((-44.9481392834, 15.3137122046), (-45.0801101874, 14.5693963057))
            Line((-45.0801101874, 14.5693963057), (-50.0422161798, 14.5693963057))
            Line((-50.0422161798, 14.5693963057), (-48.3582674441, 24.1715992846))
            add(Edge.make_bspline(
                [(-48.3582674441, 24.1715992846), (-47.9834700766, 26.2672972409), (-47.9834700766, 26.9113152527)],
                knots=[0, 0, 0, 1, 1, 1], degree=2))
            add(Edge.make_bspline(
                [(-47.9834700766, 26.9113152527), (-47.9834700766, 27.6503523154), (-48.3793827888, 28.1122504796)],
                knots=[0, 0, 0, 1, 1, 1], degree=2))
            add(Edge.make_bspline(
                [(-48.3793827888, 28.1122504796), (-48.7752955009, 28.5741486438), (-49.6304669592, 28.5741486438)],
                knots=[0, 0, 0, 1, 1, 1], degree=2))
            add(Edge.make_bspline(
                [(-49.6304669592, 28.5741486438), (-50.8657146211, 28.5741486438), (-52.3015580572, 27.5447755922)],
                knots=[0, 0, 0, 1, 1, 1], degree=2))
            add(Edge.make_bspline(
                [(-52.3015580572, 27.5447755922), (-53.7374014933, 26.5154025406), (-54.6611978217, 25.0109342344)],
                knots=[0, 0, 0, 1, 1, 1], degree=2))
            Line((-54.6611978217, 25.0109342344), (-56.4929539699, 14.5693963057))
            Line((-56.4929539699, 14.5693963057), (-59.2168334296, 14.5693963057))
        make_face(mode=Mode.SUBTRACT)
        with BuildLine():
            add(Edge.make_bspline(
                [(-22.5605951199, 36.4132203445), (-22.0327115037, 35.8853367283), (-22.0327115037, 35.1410208294)],
                knots=[0, 0, 0, 1, 1, 1], degree=2))
            add(Edge.make_bspline(
                [(-22.0327115037, 35.1410208294), (-22.0327115037, 34.4125414391), (-22.5605951199, 33.8846578229)],
                knots=[0, 0, 0, 1, 1, 1], degree=2))
            add(Edge.make_bspline(
                [(-22.5605951199, 33.8846578229), (-23.0884787361, 33.3567742067), (-23.8275157988, 33.3567742067)],
                knots=[0, 0, 0, 1, 1, 1], degree=2))
            add(Edge.make_bspline(
                [(-23.8275157988, 33.3567742067), (-24.5559951892, 33.3567742067), (-25.0838788054, 33.8846578229)],
                knots=[0, 0, 0, 1, 1, 1], degree=2))
            add(Edge.make_bspline(
                [(-25.0838788054, 33.8846578229), (-25.6117624216, 34.4125414391), (-25.6117624216, 35.1410208294)],
                knots=[0, 0, 0, 1, 1, 1], degree=2))
            add(Edge.make_bspline(
                [(-25.6117624216, 35.1410208294), (-25.6117624216, 35.8853367283), (-25.0838788054, 36.4132203445)],
                knots=[0, 0, 0, 1, 1, 1], degree=2))
            add(Edge.make_bspline(
                [(-25.0838788054, 36.4132203445), (-24.5559951892, 36.9411039607), (-23.8275157988, 36.9411039607)],
                knots=[0, 0, 0, 1, 1, 1], degree=2))
            add(Edge.make_bspline(
                [(-23.8275157988, 36.9411039607), (-23.0884787361, 36.9411039607), (-22.5605951199, 36.4132203445)],
                knots=[0, 0, 0, 1, 1, 1], degree=2))
        make_face(mode=Mode.SUBTRACT)
    extrude(amount=F1_DEPTH)


solid = f1.part
